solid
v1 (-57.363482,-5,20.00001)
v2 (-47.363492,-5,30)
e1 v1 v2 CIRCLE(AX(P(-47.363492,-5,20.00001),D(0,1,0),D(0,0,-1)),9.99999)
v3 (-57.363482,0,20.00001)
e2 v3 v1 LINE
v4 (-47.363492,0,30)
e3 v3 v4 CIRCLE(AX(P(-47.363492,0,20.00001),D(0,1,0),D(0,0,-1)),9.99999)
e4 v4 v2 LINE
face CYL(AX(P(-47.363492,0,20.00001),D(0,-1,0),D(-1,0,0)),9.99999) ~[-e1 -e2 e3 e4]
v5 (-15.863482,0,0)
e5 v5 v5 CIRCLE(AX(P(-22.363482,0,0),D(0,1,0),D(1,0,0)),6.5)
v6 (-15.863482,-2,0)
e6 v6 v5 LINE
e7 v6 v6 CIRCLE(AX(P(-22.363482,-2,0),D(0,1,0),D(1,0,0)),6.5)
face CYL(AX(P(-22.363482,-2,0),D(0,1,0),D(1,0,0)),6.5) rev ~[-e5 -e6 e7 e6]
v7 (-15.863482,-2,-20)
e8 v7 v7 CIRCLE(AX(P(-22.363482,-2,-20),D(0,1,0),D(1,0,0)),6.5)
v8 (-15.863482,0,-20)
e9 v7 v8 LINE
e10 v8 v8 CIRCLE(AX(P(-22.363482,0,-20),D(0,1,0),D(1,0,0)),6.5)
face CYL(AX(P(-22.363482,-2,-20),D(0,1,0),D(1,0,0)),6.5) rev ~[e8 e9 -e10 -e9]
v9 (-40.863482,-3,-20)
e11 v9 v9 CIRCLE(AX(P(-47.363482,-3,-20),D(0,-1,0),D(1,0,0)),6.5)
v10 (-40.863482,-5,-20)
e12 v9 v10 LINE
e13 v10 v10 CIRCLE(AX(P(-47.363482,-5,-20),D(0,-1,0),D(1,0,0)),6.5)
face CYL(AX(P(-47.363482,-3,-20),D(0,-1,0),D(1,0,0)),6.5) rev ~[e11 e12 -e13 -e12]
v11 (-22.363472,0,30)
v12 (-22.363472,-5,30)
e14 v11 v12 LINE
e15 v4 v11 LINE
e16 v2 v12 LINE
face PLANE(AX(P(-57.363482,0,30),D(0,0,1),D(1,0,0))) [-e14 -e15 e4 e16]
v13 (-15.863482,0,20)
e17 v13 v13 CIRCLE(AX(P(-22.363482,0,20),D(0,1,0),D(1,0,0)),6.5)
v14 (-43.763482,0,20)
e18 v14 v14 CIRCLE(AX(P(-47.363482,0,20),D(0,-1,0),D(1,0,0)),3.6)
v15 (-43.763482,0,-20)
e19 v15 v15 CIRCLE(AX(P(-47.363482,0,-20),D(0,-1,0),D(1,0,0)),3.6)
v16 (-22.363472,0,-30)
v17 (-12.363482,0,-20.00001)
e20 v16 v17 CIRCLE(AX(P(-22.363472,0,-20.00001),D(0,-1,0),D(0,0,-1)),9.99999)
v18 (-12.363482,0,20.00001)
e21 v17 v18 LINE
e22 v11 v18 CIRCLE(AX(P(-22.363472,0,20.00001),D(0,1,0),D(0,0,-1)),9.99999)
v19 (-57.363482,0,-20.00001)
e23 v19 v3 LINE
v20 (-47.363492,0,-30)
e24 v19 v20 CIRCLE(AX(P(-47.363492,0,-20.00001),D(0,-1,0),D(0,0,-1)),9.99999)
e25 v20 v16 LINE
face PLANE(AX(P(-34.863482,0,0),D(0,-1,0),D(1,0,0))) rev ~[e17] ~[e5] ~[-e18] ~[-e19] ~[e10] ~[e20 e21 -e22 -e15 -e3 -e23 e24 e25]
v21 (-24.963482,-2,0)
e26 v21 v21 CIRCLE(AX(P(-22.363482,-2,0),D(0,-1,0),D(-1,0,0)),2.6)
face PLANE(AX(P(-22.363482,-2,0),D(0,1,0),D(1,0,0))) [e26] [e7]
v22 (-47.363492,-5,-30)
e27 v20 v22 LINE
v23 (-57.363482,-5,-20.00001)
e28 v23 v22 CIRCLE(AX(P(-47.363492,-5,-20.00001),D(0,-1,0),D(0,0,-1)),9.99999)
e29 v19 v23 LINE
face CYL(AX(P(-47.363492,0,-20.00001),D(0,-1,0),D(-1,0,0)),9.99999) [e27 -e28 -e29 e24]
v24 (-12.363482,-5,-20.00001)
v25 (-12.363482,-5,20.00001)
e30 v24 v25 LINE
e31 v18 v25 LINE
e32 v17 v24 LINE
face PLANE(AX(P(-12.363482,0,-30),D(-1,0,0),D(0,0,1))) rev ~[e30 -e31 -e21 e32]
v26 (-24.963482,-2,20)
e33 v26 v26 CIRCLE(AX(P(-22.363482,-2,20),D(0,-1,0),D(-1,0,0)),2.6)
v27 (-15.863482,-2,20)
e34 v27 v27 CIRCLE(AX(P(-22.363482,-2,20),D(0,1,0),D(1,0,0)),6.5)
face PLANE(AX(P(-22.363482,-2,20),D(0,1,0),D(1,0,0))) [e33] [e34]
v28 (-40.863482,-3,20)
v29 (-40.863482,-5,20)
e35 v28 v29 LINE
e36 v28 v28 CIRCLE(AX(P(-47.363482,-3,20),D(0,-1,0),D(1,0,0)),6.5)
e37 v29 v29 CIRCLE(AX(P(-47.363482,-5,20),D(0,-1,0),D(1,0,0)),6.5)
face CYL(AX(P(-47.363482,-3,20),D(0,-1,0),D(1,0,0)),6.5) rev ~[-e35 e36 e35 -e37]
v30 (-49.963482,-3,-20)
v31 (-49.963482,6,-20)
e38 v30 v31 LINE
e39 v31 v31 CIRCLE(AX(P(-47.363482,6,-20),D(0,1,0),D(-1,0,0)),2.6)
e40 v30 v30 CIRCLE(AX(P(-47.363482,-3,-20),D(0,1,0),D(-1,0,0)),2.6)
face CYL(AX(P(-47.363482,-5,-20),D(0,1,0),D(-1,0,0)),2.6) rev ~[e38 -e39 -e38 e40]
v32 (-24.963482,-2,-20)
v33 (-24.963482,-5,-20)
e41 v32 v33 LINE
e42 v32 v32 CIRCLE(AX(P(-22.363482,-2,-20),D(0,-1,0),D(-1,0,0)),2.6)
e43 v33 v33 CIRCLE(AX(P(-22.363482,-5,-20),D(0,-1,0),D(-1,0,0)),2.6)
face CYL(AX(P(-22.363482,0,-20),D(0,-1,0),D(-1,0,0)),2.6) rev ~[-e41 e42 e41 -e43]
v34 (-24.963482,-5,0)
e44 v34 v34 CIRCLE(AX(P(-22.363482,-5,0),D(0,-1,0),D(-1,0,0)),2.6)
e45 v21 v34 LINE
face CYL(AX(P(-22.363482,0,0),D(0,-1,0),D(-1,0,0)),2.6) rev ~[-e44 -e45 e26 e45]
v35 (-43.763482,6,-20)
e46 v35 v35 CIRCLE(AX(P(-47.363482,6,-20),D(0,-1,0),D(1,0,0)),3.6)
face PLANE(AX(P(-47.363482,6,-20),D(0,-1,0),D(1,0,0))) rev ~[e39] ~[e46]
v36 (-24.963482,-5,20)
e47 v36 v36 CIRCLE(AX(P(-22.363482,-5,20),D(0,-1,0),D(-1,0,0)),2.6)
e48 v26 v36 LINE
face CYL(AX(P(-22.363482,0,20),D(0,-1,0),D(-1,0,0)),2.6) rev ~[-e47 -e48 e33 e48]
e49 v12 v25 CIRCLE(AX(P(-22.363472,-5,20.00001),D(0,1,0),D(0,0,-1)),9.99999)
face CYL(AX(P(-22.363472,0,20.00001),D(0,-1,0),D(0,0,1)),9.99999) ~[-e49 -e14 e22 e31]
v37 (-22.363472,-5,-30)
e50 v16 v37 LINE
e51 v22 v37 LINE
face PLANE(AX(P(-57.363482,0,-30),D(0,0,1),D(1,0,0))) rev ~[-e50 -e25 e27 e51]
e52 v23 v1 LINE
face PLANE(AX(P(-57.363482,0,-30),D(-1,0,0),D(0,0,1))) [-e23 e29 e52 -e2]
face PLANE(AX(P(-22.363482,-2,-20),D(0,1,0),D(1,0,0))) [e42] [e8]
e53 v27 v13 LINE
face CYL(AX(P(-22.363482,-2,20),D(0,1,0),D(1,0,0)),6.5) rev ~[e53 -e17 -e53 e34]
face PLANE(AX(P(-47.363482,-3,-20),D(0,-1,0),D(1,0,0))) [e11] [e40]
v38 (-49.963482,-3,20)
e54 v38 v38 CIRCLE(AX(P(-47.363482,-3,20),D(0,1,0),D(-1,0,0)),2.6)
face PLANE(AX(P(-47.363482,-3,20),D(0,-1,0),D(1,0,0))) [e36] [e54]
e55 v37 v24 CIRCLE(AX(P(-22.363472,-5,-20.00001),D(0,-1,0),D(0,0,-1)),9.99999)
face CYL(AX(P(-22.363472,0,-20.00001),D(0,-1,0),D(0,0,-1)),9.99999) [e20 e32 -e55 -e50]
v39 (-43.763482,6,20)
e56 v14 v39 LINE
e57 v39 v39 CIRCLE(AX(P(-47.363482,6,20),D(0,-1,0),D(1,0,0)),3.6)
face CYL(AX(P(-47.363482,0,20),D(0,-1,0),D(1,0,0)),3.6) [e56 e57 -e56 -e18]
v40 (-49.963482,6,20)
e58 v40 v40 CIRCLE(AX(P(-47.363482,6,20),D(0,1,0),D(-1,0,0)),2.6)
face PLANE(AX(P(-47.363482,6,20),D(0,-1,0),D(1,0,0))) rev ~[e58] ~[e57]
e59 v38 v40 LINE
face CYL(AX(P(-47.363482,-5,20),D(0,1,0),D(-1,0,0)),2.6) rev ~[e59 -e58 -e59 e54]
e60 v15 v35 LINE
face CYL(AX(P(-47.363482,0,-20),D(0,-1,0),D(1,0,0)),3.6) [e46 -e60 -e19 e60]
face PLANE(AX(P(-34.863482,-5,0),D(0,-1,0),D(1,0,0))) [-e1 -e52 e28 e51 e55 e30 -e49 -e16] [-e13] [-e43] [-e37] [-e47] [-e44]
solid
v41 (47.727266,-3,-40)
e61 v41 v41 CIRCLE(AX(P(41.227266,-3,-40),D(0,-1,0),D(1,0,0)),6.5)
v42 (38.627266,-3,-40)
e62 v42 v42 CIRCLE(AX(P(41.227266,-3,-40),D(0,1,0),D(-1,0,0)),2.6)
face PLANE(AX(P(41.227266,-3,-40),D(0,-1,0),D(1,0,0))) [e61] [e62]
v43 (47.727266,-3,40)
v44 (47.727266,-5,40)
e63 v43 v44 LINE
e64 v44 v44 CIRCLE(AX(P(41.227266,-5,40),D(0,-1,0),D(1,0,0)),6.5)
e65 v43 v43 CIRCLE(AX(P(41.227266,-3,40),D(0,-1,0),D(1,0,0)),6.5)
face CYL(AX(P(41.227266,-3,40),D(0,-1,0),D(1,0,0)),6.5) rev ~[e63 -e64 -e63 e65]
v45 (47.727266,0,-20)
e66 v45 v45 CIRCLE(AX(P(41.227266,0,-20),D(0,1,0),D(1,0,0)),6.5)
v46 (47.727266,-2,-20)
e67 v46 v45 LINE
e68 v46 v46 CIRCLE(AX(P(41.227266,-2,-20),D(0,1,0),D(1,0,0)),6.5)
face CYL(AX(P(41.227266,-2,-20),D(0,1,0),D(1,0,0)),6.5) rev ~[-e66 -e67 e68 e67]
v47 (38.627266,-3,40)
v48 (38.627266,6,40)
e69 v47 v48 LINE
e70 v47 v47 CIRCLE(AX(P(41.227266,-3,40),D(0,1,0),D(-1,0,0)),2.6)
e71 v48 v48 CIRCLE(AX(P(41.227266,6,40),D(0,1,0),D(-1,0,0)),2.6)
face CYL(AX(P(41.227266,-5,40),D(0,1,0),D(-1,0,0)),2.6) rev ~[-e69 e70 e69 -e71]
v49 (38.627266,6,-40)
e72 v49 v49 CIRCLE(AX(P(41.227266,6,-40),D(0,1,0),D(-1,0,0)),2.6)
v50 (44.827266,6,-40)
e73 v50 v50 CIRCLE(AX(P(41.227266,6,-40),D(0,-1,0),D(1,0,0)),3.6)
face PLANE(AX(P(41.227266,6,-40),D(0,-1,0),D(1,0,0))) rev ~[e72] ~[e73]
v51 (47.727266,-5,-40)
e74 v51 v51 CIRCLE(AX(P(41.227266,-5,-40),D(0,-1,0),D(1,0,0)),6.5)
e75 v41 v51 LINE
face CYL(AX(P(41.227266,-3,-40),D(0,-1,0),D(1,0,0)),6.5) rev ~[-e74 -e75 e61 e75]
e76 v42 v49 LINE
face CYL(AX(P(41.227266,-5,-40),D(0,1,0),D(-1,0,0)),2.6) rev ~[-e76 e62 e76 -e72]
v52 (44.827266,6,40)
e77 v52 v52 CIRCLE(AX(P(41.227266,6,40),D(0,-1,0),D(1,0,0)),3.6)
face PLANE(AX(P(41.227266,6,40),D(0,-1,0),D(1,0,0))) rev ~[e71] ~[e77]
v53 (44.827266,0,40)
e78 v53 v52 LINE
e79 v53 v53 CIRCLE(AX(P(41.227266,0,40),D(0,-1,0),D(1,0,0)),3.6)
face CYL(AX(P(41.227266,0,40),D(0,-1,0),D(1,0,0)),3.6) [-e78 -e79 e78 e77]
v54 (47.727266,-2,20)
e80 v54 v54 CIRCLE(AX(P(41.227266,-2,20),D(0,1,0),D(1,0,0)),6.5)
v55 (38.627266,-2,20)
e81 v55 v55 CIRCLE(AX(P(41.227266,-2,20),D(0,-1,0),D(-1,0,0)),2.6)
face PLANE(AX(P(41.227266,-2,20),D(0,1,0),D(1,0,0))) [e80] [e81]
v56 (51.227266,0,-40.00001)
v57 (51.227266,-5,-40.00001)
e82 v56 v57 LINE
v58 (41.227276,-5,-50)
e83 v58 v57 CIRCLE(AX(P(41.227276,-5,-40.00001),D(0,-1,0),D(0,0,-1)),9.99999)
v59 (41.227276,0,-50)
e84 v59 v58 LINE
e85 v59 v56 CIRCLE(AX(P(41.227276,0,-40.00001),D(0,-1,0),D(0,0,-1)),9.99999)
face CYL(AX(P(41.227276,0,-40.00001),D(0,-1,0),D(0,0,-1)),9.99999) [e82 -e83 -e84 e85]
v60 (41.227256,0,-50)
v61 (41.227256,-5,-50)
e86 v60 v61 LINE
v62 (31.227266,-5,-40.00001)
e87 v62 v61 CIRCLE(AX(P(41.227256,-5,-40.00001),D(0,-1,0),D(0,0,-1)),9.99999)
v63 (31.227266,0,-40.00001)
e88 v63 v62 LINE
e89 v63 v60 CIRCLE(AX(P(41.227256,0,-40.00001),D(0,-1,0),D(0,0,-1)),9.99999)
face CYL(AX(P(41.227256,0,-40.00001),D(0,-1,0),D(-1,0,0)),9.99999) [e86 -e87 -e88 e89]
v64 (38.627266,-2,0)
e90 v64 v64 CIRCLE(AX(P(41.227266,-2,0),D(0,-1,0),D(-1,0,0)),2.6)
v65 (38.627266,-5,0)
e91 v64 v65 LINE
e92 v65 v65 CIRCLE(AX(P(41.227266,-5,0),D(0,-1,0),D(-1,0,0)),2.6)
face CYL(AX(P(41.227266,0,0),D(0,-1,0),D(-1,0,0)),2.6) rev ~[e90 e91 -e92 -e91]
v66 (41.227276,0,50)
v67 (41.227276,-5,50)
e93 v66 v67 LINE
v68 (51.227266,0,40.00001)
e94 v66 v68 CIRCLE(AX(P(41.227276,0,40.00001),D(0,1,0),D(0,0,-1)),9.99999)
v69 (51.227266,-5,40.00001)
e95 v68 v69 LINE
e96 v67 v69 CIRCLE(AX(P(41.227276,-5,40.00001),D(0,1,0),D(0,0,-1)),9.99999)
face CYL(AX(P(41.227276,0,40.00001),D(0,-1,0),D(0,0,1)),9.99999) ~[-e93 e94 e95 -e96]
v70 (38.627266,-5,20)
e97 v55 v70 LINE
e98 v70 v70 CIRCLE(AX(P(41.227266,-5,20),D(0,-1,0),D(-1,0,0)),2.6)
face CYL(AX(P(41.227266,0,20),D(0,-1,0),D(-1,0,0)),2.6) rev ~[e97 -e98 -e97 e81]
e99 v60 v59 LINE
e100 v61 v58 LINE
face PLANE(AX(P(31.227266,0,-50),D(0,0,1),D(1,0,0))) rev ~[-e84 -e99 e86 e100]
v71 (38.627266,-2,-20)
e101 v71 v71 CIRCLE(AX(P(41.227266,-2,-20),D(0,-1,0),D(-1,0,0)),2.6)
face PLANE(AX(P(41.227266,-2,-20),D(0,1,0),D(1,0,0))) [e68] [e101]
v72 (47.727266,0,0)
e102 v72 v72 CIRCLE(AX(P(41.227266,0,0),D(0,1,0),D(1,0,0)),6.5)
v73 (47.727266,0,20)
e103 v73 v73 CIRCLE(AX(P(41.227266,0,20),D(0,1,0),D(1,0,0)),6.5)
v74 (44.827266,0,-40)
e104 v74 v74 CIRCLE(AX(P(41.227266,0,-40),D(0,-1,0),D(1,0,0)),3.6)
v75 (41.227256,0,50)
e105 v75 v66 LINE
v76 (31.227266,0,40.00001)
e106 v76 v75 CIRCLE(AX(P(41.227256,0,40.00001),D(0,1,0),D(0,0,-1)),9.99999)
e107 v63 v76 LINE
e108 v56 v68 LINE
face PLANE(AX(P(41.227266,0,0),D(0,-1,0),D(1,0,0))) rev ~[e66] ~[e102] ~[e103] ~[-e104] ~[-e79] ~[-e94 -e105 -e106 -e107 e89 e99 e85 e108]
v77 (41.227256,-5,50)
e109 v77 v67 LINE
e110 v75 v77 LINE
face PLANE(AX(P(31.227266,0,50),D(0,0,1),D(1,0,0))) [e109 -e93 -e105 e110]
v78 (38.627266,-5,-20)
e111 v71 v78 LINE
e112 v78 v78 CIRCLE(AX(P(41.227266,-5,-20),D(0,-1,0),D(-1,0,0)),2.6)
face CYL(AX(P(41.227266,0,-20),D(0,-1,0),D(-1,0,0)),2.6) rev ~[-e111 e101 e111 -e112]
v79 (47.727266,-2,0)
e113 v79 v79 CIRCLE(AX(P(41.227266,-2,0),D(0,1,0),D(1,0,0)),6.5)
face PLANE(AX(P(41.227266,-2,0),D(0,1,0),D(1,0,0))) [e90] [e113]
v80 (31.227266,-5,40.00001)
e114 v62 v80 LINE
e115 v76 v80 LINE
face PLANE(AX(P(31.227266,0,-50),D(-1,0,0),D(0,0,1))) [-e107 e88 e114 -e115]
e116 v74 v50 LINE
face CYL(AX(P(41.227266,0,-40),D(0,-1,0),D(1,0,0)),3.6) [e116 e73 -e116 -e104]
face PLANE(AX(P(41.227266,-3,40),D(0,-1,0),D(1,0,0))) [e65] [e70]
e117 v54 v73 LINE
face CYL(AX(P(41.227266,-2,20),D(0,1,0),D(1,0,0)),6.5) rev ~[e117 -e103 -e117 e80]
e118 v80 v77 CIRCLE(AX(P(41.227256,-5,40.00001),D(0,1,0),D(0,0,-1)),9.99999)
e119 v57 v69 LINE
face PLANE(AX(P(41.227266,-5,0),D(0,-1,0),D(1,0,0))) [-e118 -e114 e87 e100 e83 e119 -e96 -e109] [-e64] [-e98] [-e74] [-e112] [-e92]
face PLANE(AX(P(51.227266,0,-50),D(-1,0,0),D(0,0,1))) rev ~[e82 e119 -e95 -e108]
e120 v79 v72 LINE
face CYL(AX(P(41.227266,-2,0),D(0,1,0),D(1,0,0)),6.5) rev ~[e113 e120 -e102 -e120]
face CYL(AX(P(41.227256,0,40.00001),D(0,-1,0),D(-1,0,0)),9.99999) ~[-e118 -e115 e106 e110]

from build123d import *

# Parameters (mm, degrees)
F0_W             = 20
F0_H             = 100
F0_R             = 3.6
F1_DEPTH         = 5
F0_W_2           = 45
F0_H_2           = 60
F2_DEPTH         = 6
F4_D             = 5.2
F4_CBORE_D       = 13
F4_CBORE_DEPTH   = 2
F4_2_D           = 5.2
F4_2_CBORE_D     = 13
F4_2_CBORE_DEPTH = 2
F5_R             = 9.99999
F5_2_R           = 9.99999
F6_D             = 5.2
F6_CBORE_D       = 13
F6_CBORE_DEPTH   = 2
F6_2_D           = 5.2
F6_2_CBORE_D     = 13
F6_2_CBORE_DEPTH = 2


# Not quite as in the source:
# - a fillet or chamfer is up to 0.001 mm smaller than in the source, because OpenCascade refuses the exact size


with BuildPart() as f1:
    # F0 (on Front) → F1 (new body)
    with BuildSketch(Plane.XZ):
        with Locations((41.227266416, 0)):
            Rectangle(F0_W, F0_H)
        with Locations((41.227266416, -40)):
            Circle(F0_R, mode=Mode.SUBTRACT)
        with Locations((41.227266416, 40)):
            Circle(F0_R, mode=Mode.SUBTRACT)
        with Locations((41.227266416, -40)):
            Circle(F0_R)
        with Locations((41.227266416, 40)):
            Circle(F0_R)
    extrude(amount=F1_DEPTH)

    # F0 (on Front) → F2, piece 2 (join)
    with BuildSketch(Plane.XZ):
        with Locations((41.227266416, 40)):
            Circle(F0_R)
        with Locations((41.227266416, -40)):
            Circle(F0_R)
    extrude(amount=-F2_DEPTH)

    # F4 (through all)
    with Locations(Plane(origin=(0, 0, 0), x_dir=(1, 0, 0), z_dir=(0, 1, 0))):
        with Locations((41.227266416, -20), (41.227266416, 0), (41.227266416, 20), (-22.3634822667, -20), (-22.3634822667, 0), (-22.3634822667, 20)):
            CounterBoreHole(F4_D / 2, F4_CBORE_D / 2, F4_CBORE_DEPTH)

    # F5 (radius 10 in the source; OpenCascade refuses exactly that, so slightly less here)
    f5_edges = [f1.edges().sort_by_distance(p)[0] for p in [
        (31.227266, -2.5, 50),
        (51.227266, -2.5, 50),
        (31.227266, -2.5, -50),
        (51.227266, -2.5, -50),
    ]]
    fillet(f5_edges, radius=F5_R)

    # F6 (through all)
    with Locations(Plane.XZ.offset(5)):
        with Locations((41.227266416, 40), (41.227266416, -40), (-47.3634822667, 20), (-47.3634822667, -20)):
            CounterBoreHole(F6_D / 2, F6_CBORE_D / 2, F6_CBORE_DEPTH)


with BuildPart() as f1b:
    # F0 (on Front) → F1, piece 2 (new body)
    with BuildSketch(Plane.XZ):
        with Locations((-34.8634822667, 0)):
            Rectangle(F0_W_2, F0_H_2)
        with Locations((-47.3634822667, -20)):
            Circle(F0_R, mode=Mode.SUBTRACT)
        with Locations((-47.3634822667, 20)):
            Circle(F0_R, mode=Mode.SUBTRACT)
        with Locations((-47.3634822667, 20)):
            Circle(F0_R)
        with Locations((-47.3634822667, -20)):
            Circle(F0_R)
    extrude(amount=F1_DEPTH)

    # F0 (on Front) → F2 (join)
    with BuildSketch(Plane.XZ):
        with Locations((-47.3634822667, 20)):
            Circle(F0_R)
        with Locations((-47.3634822667, -20)):
            Circle(F0_R)
    extrude(amount=-F2_DEPTH)

    # F4#2 (through all)
    with Locations(Plane(origin=(0, 0, 0), x_dir=(1, 0, 0), z_dir=(0, 1, 0))):
        with Locations((41.227266416, -20), (41.227266416, 0), (41.227266416, 20), (-22.3634822667, -20), (-22.3634822667, 0), (-22.3634822667, 20)):
            CounterBoreHole(F4_2_D / 2, F4_2_CBORE_D / 2, F4_2_CBORE_DEPTH)

    # F5#2 (radius 10 in the source; OpenCascade refuses exactly that, so slightly less here)
    f5_2_edges = [f1b.edges().sort_by_distance(p)[0] for p in [
        (-57.363482, -2.5, 30),
        (-57.363482, -2.5, -30),
        (-12.363482, -2.5, -30),
        (-12.363482, -2.5, 30),
    ]]
    fillet(f5_2_edges, radius=F5_2_R)

    # F6#2 (through all)
    with Locations(Plane.XZ.offset(5)):
        with Locations((41.227266416, 40), (41.227266416, -40), (-47.3634822667, 20), (-47.3634822667, -20)):
            CounterBoreHole(F6_2_D / 2, F6_2_CBORE_D / 2, F6_2_CBORE_DEPTH)


solid = Compound([f1.part, f1b.part])
